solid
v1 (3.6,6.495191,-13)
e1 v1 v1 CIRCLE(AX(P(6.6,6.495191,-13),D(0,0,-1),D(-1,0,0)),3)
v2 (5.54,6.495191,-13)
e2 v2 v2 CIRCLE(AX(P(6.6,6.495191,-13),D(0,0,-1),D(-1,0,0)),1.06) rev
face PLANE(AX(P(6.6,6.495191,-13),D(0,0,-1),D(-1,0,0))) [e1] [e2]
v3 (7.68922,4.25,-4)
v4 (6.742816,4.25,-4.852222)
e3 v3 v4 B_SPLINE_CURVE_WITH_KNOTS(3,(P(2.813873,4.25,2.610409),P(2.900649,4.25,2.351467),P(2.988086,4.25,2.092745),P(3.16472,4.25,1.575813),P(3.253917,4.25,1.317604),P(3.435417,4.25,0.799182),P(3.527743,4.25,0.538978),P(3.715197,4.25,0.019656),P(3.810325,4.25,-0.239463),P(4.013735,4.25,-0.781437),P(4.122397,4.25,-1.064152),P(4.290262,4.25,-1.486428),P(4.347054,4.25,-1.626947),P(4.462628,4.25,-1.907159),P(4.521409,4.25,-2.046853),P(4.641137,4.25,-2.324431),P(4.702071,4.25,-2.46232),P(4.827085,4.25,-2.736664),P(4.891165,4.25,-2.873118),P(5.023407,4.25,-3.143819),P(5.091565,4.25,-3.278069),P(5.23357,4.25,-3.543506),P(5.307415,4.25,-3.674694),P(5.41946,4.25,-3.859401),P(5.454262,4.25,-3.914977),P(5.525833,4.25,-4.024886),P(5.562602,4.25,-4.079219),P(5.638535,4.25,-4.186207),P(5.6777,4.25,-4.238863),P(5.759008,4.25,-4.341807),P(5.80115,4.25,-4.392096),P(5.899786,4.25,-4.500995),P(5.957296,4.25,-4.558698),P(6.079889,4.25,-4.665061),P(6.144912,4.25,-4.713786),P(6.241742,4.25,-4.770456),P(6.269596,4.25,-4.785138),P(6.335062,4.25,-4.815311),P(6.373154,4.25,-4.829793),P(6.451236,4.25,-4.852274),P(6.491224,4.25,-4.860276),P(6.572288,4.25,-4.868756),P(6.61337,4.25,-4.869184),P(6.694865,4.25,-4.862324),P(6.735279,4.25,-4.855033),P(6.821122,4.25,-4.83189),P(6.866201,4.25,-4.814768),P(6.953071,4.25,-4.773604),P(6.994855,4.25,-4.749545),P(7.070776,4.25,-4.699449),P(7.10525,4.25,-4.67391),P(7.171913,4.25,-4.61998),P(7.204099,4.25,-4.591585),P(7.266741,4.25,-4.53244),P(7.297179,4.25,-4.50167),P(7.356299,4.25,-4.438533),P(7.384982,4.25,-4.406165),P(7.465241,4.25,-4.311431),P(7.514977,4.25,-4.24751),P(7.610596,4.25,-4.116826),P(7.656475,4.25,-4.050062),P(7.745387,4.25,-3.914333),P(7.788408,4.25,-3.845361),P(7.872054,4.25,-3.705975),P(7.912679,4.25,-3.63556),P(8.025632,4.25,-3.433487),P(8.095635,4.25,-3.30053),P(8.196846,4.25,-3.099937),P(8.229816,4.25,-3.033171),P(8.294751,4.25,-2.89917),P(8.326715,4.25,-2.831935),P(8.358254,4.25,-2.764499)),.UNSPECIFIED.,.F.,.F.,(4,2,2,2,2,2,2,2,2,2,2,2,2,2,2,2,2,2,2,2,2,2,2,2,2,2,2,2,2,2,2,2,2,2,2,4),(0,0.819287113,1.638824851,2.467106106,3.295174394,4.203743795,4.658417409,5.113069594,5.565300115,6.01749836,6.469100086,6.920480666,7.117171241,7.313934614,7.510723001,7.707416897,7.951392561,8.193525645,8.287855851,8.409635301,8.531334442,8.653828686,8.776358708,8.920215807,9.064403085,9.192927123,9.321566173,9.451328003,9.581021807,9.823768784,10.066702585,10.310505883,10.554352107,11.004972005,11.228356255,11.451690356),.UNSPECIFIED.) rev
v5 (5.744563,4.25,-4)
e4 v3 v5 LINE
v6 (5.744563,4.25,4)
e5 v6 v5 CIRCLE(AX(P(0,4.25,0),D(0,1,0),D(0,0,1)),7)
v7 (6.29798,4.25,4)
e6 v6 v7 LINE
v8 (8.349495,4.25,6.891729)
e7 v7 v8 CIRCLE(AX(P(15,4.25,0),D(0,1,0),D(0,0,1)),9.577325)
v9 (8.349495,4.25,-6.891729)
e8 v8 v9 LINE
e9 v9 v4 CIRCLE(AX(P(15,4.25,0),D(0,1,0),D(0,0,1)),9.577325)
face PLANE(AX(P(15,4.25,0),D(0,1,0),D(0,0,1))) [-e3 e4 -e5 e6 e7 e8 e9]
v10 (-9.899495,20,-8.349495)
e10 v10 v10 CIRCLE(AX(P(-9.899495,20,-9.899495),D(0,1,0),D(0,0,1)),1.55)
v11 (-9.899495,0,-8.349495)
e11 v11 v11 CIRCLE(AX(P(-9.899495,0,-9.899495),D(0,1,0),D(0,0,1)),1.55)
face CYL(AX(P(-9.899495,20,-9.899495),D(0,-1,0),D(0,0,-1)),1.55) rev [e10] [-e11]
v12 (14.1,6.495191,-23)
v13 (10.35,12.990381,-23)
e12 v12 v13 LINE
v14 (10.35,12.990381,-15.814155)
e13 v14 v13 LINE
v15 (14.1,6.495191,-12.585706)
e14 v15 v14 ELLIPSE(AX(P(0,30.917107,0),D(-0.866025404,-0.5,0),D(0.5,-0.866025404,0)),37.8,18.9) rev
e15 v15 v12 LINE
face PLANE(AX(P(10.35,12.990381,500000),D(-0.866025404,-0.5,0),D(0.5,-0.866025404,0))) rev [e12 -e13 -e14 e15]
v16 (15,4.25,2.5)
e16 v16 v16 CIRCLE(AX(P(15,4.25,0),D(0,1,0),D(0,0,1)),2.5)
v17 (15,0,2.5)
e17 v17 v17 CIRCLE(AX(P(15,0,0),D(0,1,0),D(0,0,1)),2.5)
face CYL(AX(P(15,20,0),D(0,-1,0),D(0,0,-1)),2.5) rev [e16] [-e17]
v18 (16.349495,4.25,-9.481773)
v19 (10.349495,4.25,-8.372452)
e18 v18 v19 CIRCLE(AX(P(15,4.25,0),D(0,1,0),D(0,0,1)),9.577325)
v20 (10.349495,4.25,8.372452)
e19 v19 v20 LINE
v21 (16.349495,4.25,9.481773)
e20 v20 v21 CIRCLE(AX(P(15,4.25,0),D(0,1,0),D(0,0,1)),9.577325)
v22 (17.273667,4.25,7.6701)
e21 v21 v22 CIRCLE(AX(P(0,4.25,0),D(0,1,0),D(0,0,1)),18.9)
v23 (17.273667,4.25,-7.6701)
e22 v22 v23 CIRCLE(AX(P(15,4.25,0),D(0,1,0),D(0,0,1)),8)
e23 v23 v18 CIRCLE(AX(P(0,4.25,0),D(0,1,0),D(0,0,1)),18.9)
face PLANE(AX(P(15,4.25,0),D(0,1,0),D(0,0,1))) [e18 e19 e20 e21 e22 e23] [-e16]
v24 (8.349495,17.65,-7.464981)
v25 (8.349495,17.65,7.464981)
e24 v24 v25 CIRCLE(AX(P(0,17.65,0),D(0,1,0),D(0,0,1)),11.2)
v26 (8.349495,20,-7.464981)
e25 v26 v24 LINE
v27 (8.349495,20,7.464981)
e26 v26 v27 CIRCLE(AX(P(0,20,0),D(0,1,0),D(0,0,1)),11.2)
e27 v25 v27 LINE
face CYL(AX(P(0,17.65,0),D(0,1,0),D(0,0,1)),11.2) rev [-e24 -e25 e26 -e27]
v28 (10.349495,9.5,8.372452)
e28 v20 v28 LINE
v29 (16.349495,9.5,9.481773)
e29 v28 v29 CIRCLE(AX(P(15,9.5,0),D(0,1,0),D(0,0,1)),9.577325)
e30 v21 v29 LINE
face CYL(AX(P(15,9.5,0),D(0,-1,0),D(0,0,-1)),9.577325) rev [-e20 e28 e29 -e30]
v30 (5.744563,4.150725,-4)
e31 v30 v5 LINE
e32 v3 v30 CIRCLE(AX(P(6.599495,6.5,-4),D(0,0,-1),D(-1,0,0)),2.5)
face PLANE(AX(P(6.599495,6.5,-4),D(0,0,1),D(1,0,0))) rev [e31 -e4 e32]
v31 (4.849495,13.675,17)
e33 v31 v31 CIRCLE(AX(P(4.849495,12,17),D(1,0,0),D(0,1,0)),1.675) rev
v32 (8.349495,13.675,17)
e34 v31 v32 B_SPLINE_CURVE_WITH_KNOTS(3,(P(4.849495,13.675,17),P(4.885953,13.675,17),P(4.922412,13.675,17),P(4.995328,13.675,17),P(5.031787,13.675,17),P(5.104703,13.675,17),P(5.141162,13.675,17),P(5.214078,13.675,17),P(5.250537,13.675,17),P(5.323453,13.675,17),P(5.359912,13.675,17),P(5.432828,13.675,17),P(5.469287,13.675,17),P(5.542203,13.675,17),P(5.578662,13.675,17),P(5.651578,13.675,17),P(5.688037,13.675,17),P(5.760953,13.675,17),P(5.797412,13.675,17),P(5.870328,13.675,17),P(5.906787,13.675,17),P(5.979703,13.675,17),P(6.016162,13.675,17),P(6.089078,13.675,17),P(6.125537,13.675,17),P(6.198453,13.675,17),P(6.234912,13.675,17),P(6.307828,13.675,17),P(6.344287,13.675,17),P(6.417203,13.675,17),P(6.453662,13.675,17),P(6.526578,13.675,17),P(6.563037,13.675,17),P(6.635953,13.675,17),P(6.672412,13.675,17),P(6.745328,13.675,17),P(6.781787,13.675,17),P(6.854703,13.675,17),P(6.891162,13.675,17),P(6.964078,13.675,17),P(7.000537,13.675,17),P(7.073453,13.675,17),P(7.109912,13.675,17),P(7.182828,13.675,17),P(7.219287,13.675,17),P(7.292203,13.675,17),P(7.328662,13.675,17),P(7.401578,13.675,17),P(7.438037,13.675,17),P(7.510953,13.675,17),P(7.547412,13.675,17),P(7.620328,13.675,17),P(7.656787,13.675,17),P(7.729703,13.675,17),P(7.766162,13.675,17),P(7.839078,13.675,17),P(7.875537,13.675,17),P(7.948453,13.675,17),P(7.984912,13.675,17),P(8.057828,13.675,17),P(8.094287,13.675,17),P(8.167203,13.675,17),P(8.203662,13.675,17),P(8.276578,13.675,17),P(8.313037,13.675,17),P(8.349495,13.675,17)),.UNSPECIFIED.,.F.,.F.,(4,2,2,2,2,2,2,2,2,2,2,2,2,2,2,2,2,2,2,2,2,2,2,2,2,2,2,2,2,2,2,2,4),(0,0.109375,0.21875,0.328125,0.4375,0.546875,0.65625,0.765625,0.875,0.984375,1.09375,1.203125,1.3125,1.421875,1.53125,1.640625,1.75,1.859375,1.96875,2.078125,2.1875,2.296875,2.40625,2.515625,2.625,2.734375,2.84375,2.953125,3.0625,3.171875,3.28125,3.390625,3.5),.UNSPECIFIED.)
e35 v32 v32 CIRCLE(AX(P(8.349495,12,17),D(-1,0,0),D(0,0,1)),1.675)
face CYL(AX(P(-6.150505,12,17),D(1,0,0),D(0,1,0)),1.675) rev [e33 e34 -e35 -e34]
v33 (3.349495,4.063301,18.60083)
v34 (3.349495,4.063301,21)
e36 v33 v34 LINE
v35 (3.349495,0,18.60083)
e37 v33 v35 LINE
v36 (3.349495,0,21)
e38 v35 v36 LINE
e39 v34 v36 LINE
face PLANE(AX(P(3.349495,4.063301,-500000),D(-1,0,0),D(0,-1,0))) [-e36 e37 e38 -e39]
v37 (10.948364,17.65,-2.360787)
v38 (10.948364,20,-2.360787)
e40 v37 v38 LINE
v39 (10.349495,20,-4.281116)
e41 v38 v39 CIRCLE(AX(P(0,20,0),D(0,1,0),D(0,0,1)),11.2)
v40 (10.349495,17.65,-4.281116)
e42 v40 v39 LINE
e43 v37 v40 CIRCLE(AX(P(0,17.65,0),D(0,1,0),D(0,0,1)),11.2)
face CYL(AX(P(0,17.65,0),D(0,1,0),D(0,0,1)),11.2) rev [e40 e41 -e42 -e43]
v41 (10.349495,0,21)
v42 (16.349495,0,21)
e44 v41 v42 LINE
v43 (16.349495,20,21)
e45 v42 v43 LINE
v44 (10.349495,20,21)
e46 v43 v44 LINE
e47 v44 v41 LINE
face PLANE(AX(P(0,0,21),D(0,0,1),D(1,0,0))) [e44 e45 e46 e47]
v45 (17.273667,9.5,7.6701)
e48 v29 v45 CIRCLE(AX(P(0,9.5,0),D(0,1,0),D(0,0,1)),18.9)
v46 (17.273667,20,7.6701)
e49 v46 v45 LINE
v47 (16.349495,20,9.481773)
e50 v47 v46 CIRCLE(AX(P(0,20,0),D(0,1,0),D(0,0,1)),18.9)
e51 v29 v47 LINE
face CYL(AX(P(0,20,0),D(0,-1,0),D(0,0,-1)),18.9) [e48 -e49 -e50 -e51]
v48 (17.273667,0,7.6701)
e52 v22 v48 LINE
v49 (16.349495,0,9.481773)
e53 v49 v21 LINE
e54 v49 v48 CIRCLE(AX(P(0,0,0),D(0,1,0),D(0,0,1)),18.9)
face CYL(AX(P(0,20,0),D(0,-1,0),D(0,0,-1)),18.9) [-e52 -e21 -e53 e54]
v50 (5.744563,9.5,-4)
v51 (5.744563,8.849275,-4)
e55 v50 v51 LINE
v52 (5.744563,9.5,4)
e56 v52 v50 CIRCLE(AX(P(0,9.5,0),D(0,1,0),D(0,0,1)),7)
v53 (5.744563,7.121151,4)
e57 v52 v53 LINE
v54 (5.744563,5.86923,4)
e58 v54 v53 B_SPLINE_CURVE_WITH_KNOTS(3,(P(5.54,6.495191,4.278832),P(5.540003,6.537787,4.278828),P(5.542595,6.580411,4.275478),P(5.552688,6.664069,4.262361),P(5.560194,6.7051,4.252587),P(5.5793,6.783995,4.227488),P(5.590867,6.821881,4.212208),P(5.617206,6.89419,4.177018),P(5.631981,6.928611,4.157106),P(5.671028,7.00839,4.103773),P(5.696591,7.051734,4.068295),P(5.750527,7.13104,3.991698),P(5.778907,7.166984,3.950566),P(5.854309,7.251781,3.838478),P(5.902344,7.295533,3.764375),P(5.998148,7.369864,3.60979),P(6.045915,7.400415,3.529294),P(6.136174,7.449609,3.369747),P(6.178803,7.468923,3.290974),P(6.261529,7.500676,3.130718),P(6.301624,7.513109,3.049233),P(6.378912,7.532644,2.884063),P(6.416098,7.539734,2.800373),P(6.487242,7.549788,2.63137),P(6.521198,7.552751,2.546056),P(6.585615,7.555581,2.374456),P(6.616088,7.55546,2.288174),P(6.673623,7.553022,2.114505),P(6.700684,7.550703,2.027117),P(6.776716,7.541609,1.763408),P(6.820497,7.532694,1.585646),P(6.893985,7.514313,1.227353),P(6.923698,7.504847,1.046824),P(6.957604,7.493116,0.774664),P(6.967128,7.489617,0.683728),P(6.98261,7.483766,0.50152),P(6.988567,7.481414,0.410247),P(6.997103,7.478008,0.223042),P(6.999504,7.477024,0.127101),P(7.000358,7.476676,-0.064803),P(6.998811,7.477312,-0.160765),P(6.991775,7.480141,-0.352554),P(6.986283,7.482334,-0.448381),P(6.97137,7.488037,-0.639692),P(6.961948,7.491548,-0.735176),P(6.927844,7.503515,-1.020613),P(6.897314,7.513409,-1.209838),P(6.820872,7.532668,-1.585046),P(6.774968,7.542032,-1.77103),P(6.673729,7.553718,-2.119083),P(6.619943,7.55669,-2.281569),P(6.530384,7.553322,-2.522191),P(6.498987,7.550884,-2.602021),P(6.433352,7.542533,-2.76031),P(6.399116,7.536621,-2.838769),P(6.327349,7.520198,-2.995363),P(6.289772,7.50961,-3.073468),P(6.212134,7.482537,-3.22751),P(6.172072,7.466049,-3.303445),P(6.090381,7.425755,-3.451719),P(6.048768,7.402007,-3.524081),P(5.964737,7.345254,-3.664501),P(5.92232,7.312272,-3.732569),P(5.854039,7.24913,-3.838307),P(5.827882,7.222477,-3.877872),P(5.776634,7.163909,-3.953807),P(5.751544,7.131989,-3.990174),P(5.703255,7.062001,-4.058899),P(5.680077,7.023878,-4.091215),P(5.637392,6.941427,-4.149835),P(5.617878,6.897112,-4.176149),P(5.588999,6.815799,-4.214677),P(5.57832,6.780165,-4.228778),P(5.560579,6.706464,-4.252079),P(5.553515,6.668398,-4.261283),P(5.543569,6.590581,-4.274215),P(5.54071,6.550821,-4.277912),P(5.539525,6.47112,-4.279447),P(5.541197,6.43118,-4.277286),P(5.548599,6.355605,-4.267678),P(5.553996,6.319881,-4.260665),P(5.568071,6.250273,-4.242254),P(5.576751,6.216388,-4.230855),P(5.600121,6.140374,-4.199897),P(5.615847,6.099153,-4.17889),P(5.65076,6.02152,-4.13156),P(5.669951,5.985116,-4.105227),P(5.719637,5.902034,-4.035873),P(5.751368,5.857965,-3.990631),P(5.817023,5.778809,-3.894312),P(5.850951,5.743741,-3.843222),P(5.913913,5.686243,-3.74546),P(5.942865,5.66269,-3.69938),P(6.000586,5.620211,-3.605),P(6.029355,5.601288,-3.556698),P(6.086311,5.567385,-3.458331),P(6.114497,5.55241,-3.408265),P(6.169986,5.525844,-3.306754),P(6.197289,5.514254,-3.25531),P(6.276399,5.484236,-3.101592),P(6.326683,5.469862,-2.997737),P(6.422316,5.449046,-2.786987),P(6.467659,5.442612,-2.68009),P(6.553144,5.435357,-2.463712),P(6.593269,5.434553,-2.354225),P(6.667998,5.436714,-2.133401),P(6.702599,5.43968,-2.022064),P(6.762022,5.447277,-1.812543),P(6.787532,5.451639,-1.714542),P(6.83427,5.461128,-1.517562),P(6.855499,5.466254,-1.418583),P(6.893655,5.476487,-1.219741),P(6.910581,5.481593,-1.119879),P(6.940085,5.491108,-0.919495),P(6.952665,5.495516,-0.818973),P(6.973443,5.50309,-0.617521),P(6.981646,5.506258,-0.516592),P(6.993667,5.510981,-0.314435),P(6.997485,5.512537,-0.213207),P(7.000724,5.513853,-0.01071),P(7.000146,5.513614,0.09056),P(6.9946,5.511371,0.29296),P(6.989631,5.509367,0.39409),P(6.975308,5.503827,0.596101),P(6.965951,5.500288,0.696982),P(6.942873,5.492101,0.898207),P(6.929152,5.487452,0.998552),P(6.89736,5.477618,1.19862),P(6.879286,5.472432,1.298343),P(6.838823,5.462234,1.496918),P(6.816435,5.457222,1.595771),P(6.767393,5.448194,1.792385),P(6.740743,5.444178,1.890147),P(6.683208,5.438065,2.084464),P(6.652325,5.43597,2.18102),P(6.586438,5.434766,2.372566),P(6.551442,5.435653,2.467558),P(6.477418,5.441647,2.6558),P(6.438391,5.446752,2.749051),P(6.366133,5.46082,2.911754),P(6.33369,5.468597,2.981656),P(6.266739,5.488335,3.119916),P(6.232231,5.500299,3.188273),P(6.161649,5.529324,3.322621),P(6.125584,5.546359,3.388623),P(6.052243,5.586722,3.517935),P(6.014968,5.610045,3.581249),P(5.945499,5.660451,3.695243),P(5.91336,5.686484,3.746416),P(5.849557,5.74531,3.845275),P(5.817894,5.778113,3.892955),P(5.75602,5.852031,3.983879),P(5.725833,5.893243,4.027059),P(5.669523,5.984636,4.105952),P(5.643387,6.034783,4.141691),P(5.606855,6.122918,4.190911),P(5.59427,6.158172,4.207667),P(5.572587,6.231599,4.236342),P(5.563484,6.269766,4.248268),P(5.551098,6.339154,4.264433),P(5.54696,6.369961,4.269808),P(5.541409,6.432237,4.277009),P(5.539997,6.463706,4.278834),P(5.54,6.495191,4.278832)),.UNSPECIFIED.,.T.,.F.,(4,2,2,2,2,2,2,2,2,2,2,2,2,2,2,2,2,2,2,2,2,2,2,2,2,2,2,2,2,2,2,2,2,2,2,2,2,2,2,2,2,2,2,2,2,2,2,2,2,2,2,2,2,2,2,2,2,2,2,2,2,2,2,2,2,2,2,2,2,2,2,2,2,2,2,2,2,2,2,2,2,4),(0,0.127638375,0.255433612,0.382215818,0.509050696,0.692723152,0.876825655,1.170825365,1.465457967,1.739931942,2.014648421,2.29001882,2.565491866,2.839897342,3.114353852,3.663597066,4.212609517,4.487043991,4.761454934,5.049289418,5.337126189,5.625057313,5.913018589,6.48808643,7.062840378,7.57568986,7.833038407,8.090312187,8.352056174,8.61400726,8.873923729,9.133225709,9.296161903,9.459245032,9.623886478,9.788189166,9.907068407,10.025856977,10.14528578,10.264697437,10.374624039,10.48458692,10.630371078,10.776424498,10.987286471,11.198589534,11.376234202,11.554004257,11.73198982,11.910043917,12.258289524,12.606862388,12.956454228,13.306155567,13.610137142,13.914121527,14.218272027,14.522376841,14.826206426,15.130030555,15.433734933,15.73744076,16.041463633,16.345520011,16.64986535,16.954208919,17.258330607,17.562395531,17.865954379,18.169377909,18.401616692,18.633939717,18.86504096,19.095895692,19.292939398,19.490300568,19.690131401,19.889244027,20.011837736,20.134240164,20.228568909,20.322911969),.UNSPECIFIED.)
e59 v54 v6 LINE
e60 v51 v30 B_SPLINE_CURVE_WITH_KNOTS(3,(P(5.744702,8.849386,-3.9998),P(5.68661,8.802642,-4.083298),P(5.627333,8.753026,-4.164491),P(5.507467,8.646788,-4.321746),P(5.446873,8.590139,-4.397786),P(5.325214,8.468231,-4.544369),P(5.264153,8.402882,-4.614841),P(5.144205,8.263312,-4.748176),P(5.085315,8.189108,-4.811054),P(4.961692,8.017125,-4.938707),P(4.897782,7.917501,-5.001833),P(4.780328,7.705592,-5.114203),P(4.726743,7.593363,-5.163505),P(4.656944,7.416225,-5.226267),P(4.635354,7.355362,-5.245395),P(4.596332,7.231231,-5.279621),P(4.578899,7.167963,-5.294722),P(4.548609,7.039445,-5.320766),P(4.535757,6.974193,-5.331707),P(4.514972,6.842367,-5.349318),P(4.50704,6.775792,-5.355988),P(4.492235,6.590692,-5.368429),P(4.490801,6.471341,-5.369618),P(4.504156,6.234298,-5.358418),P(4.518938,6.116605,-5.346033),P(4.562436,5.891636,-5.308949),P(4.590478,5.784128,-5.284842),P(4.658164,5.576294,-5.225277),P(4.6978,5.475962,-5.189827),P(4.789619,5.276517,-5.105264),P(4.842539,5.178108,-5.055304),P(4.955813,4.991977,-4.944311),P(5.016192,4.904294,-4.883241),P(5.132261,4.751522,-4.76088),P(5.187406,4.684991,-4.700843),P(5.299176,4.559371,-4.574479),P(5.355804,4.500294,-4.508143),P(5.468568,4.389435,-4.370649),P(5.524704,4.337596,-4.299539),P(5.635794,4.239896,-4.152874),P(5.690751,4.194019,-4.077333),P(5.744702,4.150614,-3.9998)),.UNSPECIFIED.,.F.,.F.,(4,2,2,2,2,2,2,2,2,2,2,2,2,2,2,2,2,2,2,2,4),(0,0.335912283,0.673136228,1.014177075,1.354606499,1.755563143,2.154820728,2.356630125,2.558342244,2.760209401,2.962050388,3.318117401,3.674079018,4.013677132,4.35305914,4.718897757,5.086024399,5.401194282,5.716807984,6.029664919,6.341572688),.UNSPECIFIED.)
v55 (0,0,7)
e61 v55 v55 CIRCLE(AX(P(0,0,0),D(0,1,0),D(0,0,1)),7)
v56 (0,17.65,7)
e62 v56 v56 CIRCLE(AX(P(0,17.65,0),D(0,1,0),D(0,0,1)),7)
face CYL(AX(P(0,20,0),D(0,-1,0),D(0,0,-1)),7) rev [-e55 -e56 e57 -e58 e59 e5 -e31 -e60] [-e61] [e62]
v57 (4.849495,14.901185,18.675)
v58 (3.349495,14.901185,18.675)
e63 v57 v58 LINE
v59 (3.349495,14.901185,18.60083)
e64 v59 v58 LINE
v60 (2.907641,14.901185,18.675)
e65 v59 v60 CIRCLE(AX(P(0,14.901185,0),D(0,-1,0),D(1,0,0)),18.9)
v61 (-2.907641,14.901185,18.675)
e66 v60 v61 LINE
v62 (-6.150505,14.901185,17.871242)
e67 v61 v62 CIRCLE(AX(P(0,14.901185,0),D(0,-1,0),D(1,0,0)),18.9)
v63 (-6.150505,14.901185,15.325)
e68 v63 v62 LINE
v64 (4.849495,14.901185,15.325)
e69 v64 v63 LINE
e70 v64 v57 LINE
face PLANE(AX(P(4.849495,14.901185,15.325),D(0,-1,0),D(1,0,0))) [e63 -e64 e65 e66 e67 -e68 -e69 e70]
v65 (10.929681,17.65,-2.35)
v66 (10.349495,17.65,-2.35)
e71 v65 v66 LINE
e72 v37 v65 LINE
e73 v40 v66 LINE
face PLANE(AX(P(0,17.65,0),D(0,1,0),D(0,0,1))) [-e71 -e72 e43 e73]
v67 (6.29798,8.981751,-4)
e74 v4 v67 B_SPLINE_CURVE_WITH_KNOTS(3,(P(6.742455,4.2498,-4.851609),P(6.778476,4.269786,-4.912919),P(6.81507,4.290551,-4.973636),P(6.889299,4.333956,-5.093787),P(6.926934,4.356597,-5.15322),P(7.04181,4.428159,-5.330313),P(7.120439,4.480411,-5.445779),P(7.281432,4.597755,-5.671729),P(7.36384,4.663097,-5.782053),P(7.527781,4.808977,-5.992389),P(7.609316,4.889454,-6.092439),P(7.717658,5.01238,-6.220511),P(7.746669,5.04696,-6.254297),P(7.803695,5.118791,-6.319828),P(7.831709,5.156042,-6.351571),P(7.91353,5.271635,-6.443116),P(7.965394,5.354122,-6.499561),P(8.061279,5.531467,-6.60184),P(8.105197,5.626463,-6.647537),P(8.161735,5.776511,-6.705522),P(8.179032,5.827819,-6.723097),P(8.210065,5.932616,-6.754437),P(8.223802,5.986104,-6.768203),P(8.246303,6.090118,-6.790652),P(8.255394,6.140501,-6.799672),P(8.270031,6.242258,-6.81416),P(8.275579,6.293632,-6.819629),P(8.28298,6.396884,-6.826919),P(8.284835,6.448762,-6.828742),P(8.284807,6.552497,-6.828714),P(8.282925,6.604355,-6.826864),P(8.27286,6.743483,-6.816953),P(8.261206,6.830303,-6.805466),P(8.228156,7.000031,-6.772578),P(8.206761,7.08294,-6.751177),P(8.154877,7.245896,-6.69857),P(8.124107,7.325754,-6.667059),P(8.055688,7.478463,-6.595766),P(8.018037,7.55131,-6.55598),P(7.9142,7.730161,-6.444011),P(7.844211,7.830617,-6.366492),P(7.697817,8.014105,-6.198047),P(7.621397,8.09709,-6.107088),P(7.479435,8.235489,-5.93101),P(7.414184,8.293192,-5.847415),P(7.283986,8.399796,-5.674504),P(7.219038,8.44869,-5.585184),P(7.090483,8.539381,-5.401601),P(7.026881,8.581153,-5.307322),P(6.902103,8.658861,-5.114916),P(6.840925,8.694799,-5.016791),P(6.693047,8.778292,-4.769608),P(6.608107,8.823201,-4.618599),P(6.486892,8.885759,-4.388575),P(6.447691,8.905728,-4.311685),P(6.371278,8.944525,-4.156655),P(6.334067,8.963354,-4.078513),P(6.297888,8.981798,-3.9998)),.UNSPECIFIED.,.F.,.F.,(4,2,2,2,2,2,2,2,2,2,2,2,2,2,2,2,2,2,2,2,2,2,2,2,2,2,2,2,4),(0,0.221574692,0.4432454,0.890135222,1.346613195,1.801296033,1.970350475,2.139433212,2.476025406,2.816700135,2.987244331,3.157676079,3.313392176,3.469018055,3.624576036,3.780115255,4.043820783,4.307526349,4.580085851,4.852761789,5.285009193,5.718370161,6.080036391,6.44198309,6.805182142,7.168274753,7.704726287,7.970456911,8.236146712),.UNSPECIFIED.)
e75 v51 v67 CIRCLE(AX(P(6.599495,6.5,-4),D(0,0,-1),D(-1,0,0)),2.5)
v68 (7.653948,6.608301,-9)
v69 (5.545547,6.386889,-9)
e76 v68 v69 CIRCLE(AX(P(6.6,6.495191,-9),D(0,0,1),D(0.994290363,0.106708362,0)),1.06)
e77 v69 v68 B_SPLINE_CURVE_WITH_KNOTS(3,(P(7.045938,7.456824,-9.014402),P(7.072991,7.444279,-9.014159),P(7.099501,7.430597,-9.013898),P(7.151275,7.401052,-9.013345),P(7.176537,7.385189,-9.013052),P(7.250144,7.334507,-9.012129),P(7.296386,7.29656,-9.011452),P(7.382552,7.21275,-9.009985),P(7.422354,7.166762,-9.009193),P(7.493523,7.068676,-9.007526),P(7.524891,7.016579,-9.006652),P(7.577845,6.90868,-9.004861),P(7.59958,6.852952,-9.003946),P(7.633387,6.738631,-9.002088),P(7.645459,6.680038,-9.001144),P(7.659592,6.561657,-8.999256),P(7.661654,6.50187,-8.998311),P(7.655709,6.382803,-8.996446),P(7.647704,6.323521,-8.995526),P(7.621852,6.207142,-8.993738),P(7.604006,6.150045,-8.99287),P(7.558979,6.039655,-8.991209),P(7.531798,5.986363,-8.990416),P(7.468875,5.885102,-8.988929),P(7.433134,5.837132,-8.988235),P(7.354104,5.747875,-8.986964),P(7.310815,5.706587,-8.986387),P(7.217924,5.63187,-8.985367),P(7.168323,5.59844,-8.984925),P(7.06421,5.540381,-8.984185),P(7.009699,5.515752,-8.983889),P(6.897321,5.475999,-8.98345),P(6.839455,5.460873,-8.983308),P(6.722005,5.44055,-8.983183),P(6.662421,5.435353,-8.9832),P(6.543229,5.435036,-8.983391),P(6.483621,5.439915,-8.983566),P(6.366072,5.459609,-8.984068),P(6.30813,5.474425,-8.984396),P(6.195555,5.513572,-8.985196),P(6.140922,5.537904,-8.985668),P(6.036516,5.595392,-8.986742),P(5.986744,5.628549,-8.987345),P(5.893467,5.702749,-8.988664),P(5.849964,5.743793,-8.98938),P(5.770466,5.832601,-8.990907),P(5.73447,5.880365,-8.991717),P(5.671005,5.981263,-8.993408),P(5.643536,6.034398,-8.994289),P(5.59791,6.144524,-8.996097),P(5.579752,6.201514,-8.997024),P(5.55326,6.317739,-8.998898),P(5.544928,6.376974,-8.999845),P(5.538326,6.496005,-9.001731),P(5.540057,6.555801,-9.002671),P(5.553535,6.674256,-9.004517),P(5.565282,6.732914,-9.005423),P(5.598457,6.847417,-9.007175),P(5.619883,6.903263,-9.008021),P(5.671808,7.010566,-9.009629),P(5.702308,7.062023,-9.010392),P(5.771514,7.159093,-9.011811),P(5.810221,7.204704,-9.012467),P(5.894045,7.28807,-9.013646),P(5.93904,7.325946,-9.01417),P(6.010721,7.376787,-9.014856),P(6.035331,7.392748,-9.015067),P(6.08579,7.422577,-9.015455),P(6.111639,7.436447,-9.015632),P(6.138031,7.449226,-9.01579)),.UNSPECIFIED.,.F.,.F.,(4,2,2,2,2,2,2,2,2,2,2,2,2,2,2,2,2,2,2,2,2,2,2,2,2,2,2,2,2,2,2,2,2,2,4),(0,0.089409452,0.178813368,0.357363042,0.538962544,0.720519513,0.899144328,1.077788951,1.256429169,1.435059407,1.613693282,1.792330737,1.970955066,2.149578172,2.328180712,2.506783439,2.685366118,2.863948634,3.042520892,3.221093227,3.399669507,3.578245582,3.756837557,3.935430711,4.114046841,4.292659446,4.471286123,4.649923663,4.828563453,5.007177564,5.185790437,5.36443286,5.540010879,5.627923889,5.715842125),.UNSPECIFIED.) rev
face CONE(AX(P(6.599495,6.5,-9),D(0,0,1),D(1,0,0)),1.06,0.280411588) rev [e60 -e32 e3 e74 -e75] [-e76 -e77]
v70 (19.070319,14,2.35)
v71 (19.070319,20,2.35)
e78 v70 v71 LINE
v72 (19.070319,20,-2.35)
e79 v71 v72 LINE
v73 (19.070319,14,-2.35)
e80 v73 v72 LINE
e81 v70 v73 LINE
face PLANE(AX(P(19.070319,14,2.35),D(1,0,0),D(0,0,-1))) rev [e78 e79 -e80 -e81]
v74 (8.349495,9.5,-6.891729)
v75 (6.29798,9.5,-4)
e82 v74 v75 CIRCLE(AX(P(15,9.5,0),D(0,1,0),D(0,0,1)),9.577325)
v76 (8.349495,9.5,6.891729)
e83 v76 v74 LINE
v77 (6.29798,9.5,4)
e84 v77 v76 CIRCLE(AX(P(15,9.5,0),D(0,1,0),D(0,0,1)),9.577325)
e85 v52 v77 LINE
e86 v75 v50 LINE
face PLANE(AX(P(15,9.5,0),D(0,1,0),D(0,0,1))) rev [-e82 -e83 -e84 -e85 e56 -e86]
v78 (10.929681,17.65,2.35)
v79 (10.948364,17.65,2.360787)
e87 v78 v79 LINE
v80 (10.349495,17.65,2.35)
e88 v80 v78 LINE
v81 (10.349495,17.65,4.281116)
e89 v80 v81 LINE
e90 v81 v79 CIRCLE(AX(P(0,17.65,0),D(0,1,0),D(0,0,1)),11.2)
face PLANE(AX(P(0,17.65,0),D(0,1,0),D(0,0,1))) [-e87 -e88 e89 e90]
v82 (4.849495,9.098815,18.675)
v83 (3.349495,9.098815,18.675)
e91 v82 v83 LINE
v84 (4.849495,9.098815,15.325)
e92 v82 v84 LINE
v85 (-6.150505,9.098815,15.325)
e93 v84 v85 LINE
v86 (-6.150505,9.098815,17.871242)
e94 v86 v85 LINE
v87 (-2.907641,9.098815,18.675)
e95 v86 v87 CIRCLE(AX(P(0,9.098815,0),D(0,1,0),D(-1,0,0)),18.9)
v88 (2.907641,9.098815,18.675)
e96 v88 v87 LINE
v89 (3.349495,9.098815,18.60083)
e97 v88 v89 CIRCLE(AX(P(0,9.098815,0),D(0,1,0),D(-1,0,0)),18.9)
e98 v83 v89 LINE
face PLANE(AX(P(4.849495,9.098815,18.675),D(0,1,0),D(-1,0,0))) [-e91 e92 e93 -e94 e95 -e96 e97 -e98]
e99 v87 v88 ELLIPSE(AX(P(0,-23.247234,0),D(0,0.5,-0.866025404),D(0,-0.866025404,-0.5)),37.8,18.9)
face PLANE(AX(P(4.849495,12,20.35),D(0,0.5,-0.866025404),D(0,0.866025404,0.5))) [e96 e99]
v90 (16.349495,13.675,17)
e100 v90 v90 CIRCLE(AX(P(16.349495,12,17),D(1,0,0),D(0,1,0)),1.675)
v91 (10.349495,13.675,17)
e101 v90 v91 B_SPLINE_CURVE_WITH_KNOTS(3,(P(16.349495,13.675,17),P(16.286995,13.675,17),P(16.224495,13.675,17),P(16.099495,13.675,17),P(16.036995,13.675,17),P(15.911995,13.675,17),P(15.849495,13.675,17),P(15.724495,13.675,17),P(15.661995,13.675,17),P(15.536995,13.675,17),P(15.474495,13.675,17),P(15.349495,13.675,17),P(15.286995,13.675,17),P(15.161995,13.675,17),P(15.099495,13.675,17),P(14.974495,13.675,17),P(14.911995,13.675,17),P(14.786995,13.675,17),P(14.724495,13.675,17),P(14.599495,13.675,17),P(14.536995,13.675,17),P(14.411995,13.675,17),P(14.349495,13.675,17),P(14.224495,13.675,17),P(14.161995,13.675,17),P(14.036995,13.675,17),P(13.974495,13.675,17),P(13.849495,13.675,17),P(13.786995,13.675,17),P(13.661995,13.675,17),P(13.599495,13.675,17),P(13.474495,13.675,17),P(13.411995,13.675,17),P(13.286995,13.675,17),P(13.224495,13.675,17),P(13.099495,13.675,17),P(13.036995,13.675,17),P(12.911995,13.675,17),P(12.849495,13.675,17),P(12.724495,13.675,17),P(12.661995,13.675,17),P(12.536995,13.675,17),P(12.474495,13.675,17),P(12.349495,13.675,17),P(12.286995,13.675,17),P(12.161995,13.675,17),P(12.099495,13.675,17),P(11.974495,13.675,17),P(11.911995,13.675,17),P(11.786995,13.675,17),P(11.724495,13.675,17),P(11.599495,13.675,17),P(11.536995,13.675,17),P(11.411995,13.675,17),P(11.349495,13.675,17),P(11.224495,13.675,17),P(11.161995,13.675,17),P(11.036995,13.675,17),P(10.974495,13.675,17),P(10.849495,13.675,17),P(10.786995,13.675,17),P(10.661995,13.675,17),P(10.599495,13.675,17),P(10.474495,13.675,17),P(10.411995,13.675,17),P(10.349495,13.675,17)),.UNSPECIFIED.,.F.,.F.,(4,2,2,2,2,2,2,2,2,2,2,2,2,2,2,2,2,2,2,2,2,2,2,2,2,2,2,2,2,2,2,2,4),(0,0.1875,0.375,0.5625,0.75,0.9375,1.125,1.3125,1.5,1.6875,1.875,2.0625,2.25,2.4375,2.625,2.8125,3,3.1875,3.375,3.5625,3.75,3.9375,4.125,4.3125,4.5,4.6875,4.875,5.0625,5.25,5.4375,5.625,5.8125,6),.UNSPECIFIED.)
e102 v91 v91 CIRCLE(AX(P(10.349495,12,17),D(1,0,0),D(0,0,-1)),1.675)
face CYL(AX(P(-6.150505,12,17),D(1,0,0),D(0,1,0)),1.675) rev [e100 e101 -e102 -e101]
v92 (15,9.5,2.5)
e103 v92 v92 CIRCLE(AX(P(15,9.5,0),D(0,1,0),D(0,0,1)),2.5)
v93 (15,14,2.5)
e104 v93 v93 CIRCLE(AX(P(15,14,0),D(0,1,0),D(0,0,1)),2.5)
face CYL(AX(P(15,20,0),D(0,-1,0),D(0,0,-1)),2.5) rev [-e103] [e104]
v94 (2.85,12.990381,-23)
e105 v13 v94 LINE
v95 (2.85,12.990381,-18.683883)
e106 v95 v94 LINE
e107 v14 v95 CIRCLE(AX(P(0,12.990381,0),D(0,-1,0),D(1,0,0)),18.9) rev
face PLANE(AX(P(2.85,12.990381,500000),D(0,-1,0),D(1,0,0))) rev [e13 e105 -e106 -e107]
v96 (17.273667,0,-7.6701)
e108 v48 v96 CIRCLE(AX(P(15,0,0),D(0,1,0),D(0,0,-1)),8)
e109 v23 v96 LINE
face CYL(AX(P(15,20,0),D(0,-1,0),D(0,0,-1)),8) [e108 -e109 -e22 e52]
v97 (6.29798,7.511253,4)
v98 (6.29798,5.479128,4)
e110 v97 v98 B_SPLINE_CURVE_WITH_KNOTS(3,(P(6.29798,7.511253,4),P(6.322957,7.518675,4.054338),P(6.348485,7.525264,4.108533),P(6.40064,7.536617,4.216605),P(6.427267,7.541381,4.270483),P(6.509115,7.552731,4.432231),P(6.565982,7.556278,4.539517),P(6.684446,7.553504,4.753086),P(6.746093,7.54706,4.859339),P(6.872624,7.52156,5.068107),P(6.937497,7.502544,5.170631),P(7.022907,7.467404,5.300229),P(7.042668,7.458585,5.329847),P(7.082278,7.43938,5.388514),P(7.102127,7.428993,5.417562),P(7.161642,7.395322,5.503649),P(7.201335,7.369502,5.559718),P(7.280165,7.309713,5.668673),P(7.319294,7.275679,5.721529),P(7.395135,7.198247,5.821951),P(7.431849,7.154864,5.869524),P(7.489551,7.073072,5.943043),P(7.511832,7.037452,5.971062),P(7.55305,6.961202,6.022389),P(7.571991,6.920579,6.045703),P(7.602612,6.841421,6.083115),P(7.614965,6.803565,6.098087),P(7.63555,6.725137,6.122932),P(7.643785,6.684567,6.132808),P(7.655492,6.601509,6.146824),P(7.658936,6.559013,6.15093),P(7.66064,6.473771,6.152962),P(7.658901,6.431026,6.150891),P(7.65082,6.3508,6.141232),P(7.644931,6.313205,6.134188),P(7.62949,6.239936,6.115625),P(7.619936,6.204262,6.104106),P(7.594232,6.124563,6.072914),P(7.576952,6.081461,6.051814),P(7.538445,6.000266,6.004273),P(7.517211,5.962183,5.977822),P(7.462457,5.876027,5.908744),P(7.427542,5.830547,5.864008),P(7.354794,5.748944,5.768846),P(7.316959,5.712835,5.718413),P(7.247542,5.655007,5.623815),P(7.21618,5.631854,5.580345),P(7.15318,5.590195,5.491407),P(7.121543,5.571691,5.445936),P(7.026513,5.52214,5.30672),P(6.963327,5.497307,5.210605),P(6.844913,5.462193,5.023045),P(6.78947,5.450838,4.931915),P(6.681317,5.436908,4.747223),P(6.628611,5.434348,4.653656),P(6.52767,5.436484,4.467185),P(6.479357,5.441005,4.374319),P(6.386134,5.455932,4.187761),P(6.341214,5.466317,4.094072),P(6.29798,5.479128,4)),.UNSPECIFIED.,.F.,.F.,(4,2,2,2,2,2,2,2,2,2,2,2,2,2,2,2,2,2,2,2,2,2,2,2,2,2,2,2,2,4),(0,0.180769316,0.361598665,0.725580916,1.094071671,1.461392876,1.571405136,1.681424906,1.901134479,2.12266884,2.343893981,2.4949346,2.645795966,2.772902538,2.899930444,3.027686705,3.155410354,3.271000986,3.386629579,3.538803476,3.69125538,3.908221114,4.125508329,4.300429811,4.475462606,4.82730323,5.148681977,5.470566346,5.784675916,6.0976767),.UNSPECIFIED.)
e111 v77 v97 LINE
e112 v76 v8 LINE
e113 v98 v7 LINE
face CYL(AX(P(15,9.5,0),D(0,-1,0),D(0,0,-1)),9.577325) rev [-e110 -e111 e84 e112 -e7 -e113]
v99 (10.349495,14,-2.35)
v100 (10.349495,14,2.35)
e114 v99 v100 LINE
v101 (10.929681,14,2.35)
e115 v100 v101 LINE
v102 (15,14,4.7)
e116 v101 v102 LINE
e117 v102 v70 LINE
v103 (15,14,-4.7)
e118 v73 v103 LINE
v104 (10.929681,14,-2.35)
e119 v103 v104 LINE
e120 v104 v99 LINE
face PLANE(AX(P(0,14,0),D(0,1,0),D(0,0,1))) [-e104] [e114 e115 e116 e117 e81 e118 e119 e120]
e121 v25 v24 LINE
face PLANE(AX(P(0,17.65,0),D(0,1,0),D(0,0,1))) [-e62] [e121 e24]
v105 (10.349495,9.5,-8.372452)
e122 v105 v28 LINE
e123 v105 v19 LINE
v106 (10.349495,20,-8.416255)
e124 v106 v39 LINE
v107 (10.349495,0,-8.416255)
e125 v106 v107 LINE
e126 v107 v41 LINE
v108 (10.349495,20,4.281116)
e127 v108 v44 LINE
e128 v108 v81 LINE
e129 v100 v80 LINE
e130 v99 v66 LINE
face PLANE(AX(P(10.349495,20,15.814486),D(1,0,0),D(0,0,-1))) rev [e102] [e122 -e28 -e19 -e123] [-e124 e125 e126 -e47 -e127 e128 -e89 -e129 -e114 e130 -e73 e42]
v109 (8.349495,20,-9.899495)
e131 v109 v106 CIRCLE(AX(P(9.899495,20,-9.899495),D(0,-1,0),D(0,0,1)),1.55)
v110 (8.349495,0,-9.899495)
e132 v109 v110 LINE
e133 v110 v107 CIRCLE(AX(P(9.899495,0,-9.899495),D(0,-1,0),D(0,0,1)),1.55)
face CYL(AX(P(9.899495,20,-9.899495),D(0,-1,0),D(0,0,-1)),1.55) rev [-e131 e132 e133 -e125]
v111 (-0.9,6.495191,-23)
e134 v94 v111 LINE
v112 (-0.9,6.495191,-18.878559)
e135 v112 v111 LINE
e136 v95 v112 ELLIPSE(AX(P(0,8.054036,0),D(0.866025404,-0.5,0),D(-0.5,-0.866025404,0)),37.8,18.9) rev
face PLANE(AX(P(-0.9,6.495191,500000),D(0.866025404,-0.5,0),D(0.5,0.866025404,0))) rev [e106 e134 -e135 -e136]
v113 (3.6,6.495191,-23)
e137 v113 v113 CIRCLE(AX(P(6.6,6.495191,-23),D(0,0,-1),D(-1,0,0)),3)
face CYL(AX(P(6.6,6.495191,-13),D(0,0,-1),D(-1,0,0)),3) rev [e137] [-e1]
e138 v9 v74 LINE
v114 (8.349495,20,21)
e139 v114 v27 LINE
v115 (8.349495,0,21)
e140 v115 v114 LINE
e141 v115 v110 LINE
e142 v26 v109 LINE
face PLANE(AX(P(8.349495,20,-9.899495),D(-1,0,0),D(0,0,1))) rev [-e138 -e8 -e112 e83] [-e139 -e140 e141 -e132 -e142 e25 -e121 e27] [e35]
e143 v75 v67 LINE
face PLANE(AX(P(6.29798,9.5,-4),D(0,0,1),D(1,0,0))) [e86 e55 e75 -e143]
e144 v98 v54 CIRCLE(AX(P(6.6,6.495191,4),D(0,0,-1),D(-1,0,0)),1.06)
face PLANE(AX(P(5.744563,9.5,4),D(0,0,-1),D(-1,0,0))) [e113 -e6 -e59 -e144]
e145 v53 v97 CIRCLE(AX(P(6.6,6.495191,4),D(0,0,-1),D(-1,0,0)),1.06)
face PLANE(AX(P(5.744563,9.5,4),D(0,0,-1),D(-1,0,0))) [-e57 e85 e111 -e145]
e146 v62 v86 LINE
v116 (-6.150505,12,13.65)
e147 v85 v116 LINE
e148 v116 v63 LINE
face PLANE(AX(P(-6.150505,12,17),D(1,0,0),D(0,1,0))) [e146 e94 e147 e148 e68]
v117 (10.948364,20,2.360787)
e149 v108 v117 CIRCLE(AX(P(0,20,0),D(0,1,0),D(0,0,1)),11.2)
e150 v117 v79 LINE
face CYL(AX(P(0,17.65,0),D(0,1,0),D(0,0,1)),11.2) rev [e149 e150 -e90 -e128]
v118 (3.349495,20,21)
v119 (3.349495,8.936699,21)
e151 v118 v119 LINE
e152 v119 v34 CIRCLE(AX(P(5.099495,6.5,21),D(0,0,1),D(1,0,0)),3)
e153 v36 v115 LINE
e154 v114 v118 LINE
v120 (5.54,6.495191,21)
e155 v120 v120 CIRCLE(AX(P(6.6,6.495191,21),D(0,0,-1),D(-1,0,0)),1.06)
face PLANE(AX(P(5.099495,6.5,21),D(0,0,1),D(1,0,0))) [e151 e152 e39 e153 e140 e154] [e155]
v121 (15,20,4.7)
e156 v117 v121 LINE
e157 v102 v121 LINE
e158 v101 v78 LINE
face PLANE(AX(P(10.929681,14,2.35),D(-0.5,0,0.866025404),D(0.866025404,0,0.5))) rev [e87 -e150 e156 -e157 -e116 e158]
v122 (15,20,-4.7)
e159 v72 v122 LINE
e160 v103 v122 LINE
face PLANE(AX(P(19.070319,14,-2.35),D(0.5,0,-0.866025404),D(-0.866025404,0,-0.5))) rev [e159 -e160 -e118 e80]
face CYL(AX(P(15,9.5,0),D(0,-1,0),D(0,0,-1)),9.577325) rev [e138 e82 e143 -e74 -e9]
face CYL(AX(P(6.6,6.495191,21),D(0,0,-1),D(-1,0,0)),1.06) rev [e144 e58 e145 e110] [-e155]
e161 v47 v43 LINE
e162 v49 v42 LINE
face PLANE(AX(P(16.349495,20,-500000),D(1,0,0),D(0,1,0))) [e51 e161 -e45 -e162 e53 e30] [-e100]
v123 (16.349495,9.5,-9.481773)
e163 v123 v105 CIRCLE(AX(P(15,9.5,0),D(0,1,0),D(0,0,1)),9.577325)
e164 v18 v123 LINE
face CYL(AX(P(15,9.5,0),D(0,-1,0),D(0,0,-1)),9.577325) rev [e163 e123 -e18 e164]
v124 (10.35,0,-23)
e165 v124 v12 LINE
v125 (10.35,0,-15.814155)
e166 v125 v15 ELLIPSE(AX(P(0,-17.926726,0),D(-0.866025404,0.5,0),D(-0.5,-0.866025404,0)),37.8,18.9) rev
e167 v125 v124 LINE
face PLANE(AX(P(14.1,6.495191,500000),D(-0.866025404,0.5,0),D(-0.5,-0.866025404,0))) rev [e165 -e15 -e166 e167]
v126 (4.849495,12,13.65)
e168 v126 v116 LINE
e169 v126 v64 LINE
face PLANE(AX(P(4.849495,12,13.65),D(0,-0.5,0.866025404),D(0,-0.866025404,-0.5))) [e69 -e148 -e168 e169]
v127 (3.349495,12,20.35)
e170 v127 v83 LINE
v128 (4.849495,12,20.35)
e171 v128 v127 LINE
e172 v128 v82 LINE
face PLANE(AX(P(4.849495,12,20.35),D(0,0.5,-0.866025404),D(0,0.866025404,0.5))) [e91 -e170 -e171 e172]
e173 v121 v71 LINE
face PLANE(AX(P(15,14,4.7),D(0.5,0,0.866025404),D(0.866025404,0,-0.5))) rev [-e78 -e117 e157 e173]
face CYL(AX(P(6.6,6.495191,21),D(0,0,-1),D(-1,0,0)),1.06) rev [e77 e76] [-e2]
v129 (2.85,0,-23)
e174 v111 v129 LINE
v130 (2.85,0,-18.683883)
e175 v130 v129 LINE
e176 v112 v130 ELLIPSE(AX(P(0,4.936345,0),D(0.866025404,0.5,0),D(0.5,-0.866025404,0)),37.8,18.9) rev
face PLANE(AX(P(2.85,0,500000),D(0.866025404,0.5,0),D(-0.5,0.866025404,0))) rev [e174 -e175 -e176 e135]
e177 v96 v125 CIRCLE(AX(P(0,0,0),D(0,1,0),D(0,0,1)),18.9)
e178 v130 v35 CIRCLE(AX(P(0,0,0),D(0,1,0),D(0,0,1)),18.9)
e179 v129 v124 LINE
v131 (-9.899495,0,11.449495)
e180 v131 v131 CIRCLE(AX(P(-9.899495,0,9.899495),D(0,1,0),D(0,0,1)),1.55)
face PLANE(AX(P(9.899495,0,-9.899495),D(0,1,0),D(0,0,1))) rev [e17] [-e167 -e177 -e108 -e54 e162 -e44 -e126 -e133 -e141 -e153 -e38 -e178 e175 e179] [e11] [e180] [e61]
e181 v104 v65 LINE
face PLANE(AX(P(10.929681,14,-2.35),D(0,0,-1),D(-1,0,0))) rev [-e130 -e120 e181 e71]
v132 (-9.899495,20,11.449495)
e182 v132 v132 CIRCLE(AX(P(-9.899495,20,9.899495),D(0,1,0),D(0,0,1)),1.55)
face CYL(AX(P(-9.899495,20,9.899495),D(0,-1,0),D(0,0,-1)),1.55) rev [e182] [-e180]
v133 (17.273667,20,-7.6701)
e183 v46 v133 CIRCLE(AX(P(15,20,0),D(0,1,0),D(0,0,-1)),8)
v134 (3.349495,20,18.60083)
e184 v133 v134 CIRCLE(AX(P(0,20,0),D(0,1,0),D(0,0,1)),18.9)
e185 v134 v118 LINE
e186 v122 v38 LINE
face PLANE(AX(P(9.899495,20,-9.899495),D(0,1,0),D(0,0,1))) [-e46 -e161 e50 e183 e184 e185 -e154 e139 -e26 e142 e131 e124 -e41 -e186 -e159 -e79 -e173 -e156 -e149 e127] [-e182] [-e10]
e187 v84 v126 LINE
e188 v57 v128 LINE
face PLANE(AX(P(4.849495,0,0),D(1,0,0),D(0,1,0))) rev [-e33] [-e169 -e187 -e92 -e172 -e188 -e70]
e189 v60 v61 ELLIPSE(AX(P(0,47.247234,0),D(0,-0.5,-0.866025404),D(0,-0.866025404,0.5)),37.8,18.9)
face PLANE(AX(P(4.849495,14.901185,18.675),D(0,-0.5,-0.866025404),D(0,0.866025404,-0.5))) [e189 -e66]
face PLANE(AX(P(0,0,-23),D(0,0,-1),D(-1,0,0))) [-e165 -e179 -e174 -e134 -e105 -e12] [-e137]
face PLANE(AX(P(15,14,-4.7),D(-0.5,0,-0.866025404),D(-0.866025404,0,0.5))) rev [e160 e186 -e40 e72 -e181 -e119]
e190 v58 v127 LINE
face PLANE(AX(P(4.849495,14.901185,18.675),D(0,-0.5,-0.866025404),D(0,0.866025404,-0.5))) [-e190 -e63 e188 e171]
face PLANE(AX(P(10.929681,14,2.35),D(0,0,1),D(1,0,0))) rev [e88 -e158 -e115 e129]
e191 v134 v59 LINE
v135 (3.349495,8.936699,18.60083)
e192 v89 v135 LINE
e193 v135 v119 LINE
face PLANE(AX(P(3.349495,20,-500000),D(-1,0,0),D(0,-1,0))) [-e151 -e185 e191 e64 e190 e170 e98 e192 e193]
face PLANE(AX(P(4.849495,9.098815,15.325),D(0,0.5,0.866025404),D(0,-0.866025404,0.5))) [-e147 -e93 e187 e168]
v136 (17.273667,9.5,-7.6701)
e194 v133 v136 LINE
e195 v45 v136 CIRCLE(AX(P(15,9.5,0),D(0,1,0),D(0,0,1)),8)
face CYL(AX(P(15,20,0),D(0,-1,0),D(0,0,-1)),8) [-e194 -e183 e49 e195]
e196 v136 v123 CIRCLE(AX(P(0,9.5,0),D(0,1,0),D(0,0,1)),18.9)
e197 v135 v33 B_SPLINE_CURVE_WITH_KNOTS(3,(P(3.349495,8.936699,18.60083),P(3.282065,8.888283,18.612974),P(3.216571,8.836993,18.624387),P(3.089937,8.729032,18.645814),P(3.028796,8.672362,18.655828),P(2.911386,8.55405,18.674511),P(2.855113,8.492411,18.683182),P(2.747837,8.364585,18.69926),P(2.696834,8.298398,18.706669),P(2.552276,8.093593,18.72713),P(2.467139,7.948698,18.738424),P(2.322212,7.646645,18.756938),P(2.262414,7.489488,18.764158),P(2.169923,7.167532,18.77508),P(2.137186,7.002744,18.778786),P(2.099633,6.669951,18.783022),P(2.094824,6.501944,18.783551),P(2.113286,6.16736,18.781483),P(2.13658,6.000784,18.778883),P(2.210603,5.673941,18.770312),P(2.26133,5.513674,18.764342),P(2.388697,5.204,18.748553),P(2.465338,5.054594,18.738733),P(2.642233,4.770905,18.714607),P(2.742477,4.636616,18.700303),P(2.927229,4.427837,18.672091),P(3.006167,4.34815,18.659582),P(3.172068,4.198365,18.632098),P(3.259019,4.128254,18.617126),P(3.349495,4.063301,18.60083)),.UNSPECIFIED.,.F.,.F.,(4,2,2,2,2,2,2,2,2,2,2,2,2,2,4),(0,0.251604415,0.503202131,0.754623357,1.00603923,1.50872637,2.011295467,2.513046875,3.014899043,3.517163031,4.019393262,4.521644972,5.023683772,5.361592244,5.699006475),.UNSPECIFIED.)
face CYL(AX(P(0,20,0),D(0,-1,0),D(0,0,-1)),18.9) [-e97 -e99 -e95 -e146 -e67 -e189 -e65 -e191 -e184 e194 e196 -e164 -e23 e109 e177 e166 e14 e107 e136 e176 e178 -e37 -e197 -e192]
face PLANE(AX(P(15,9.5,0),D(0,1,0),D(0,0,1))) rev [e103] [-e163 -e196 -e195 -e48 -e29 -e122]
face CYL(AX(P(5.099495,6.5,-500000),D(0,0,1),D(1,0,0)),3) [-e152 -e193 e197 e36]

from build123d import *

# Parameters (mm, degrees)
SKETCH1_R                = 1.55
SKETCH1_R_2              = 7
SKETCH1_R_3              = 2.5
BOSS_EXTRUDE1_DEPTH      = 20
BOSS_EXTRUDE2_REACH      = 53.813
BOSS_EXTRUDE2_END_RADIUS = 18.9
BOSS_EXTRUDE3_REACH      = 55.526
BOSS_EXTRUDE3_END_RADIUS = 18.9
SKETCH3_W                = 6
SKETCH3_H                = 20
SKETCH5_R                = 1.675
CUT_EXTRUDE3_DEPTH       = 22.5
CUT_EXTRUDE4_DEPTH       = 11
CUT_EXTRUDE5_DEPTH       = 5.25
SKETCH8_R                = 1.06
CUT_EXTRUDE6_DEPTH       = 54.525694884
SKETCH9_R                = 3
CUT_EXTRUDE7_DEPTH       = 10
SKETCH11_R               = 11.2
CUT_EXTRUDE9_DEPTH       = 2.35
CUT_EXTRUDE8_DEPTH       = 6


with BuildPart() as part:
    # Sketch1 → Boss-Extrude1 (new body)
    with BuildSketch(Plane(origin=(0, 0, 0), x_dir=(1, 0, 0), z_dir=(0, 1, 0))):
        with BuildLine():
            Line((10.349494937, -15.814485593), (10.349494937, 8.416255239))
            ThreePointArc((10.349494937, 8.416255239), (10.822804202, 11.144484896), (8.349494937, 9.899494937))
            Line((8.349494937, 9.899494937), (8.349494937, -16.955705067))
            ThreePointArc((8.349494937, -16.955705067), (-17.76919177, 6.439396233), (17.273666667, 7.670100383))
            ThreePointArc((17.273666667, 7.670100383), (23, 0), (17.273666667, -7.670100383))
            ThreePointArc((17.273666667, -7.670100383), (14.399392933, -12.242037541), (10.349494937, -15.814485593))
        make_face()
        with Locations(Location((-9.899494937, 9.899494937, 0), (0, 0, 270))):
            Circle(SKETCH1_R, mode=Mode.SUBTRACT)
        with Locations(Location((-9.899494937, -9.899494937, 0), (0, 0, 270))):
            Circle(SKETCH1_R, mode=Mode.SUBTRACT)
        with Locations(Location((0, 0, 0), (0, 0, 270))):
            Circle(SKETCH1_R_2, mode=Mode.SUBTRACT)
        with Locations(Location((15, 0, 0), (0, 0, 270))):
            Circle(SKETCH1_R_3, mode=Mode.SUBTRACT)
    extrude(amount=BOSS_EXTRUDE1_DEPTH)

    # Boss-Extrude2: up to this cylinder (the profile starts outside it)
    boss_extrude2_end = Plane(origin=(0, 6.495191, 0), z_dir=(0, -1, 0)) * Cylinder(BOSS_EXTRUDE2_END_RADIUS, 146.426, mode=Mode.PRIVATE)
    # Sketch2 → Boss-Extrude2 (add, up to the surface)
    with BuildSketch(Plane.XY.offset(-23), mode=Mode.PRIVATE) as boss_extrude2_sk1:
        Polygon((14.1, 6.495190528), (10.35, 0), (2.85, 0), (-0.9, 6.495190528), (2.85, 12.990381057), (10.35, 12.990381057), align=None)
    boss_extrude2_tool1 = extrude(boss_extrude2_sk1.sketch, amount=BOSS_EXTRUDE2_REACH, mode=Mode.PRIVATE) - boss_extrude2_end
    add(boss_extrude2_tool1.solids().sort_by_distance((6.6, 6.495191, -23))[0])

    # Boss-Extrude3: up to this cylinder (the profile starts outside it)
    boss_extrude3_end = Plane(origin=(0, 9.928375, 0), z_dir=(0, -1, 0)) * Cylinder(BOSS_EXTRUDE3_END_RADIUS, 149.99525, mode=Mode.PRIVATE)
    # Sketch3 → Boss-Extrude3 (add, up to the surface)
    with BuildSketch(Plane.XY.offset(21), mode=Mode.PRIVATE) as boss_extrude3_sk1:
        with BuildLine():
            Line((8.349494937, 20), (3.349494937, 20))
            Line((3.349494937, 20), (3.349494937, 8.936698586))
            ThreePointArc((3.349494937, 8.936698586), (2.099494937, 6.5), (3.349494937, 4.063301414))
            Line((3.349494937, 4.063301414), (3.349494937, 0))
            Line((3.349494937, 0), (8.349494937, 0))
            Line((8.349494937, 0), (8.349494937, 20))
        make_face()
    boss_extrude3_tool1 = extrude(boss_extrude3_sk1.sketch, amount=-BOSS_EXTRUDE3_REACH, mode=Mode.PRIVATE) - boss_extrude3_end
    add(boss_extrude3_tool1.solids().sort_by_distance((5.726294, 9.85675, 21))[0])
    # Sketch3 → Boss-Extrude3 (add, up to the surface)
    with BuildSketch(Plane.XY.offset(21), mode=Mode.PRIVATE) as boss_extrude3_sk2:
        with Locations((13.349494937, 10)):
            Rectangle(SKETCH3_W, SKETCH3_H)
    boss_extrude3_tool2 = extrude(boss_extrude3_sk2.sketch, amount=-BOSS_EXTRUDE3_REACH, mode=Mode.PRIVATE) - boss_extrude3_end
    add(boss_extrude3_tool2.solids().sort_by_distance((13.349495, 10, 21))[0])

    # Sketch5 → Cut-Extrude3 (cut)
    with BuildSketch(Plane(origin=(16.349494937, 0, 0), x_dir=(0, 0, -1), z_dir=(1, 0, 0))):
        with Locations(Location((-17, 12, 0), (0, 0, 90))):
            Circle(SKETCH5_R)
    extrude(amount=-CUT_EXTRUDE3_DEPTH, mode=Mode.SUBTRACT)

    # Sketch6 → Cut-Extrude4 (cut)
    with BuildSketch(Plane(origin=(-6.150505063, 0, 0), x_dir=(0, 0, -1), z_dir=(1, 0, 0))):
        Polygon((-20.35, 12), (-18.675, 9.098814897), (-15.325, 9.098814897), (-13.65, 12), (-15.325, 14.901185103), (-18.675, 14.901185103), align=None)
    extrude(amount=CUT_EXTRUDE4_DEPTH, mode=Mode.SUBTRACT)

    # Sketch7 → Cut-Extrude5 (cut)
    with BuildSketch(Plane(origin=(0, 4.25, 0), x_dir=(1, 0, 0), z_dir=(0, 1, 0))):
        with BuildLine():
            Line((6.29798001, 4), (5.744562647, 4))
            Line((5.744562647, 4), (5.744562647, -4))
            Line((5.744562647, -4), (6.29798001, -4))
            ThreePointArc((6.29798001, -4), (24.577324882, 0), (6.29798001, 4))
        make_face()
    extrude(amount=CUT_EXTRUDE5_DEPTH, mode=Mode.SUBTRACT)

    # Sketch8 → Cut-Extrude6 (cut, through all)
    with BuildSketch(Plane(origin=(0, 0, -23), x_dir=(-1, 0, 0), z_dir=(0, 0, -1))):
        with Locations((-6.6, 6.495190528)):
            Circle(SKETCH8_R)
    extrude(amount=-CUT_EXTRUDE6_DEPTH, mode=Mode.SUBTRACT)

    # Sketch9 → Cut-Extrude7 (cut)
    with BuildSketch(Plane(origin=(0, 0, -23), x_dir=(-1, 0, 0), z_dir=(0, 0, -1))):
        with Locations((-6.6, 6.495190528)):
            Circle(SKETCH9_R)
    extrude(amount=-CUT_EXTRUDE7_DEPTH, mode=Mode.SUBTRACT)

    # Sketch11 → Cut-Extrude9 (cut)
    with BuildSketch(Plane(origin=(0, 20, 0), x_dir=(1, 0, 0), z_dir=(0, 1, 0))):
        Circle(SKETCH11_R)
    extrude(amount=-CUT_EXTRUDE9_DEPTH, mode=Mode.SUBTRACT)

    # Sketch10 → Cut-Extrude8 (cut)
    with BuildSketch(Plane(origin=(0, 20, 0), x_dir=(1, 0, 0), z_dir=(0, 1, 0))):
        Polygon((15, 4.7), (10.929680602, 2.35), (10.349494937, 2.35), (10.349494937, -2.35), (10.929680602, -2.35), (15, -4.7), (19.070319398, -2.35), (19.070319398, 2.35), align=None)
    extrude(amount=-CUT_EXTRUDE8_DEPTH, mode=Mode.SUBTRACT)

    # Cut-Revolve1: read off the stored shape, not the designer's step
    # Cut-Revolve1: loft between two sections, ruled curve by curve
    cut_revolve1_from = [
        Edge.make_three_point_arc((7.653578644, 6.608263478, -9.001288479), (6.491231459, 7.554083708, -9.001288479), (5.545411229, 6.391736522, -9.001288479)),
        Edge.make_three_point_arc((5.545411229, 6.391736522, -9.001288479), (6.707758415, 5.445916292, -9.001288479), (7.653578644, 6.608263478, -9.001288479)),
    ]
    cut_revolve1_to = [
        Edge.make_three_point_arc((9.086412031, 6.755427811, -4), (6.344067126, 8.986917094, -4), (4.112577842, 6.244572189, -4)),
        Edge.make_three_point_arc((4.112577842, 6.244572189, -4), (6.854922748, 4.013082906, -4), (9.086412031, 6.755427811, -4)),
    ]
    cut_revolve1 = Solid(Shell([*[Face.make_surface_from_curves(cut_revolve1_from[k], cut_revolve1_to[k]) for k in range(2)], Face(Wire(cut_revolve1_from)), Face(Wire(cut_revolve1_to))]))
    add(cut_revolve1, mode=Mode.SUBTRACT)


solid = part.part
